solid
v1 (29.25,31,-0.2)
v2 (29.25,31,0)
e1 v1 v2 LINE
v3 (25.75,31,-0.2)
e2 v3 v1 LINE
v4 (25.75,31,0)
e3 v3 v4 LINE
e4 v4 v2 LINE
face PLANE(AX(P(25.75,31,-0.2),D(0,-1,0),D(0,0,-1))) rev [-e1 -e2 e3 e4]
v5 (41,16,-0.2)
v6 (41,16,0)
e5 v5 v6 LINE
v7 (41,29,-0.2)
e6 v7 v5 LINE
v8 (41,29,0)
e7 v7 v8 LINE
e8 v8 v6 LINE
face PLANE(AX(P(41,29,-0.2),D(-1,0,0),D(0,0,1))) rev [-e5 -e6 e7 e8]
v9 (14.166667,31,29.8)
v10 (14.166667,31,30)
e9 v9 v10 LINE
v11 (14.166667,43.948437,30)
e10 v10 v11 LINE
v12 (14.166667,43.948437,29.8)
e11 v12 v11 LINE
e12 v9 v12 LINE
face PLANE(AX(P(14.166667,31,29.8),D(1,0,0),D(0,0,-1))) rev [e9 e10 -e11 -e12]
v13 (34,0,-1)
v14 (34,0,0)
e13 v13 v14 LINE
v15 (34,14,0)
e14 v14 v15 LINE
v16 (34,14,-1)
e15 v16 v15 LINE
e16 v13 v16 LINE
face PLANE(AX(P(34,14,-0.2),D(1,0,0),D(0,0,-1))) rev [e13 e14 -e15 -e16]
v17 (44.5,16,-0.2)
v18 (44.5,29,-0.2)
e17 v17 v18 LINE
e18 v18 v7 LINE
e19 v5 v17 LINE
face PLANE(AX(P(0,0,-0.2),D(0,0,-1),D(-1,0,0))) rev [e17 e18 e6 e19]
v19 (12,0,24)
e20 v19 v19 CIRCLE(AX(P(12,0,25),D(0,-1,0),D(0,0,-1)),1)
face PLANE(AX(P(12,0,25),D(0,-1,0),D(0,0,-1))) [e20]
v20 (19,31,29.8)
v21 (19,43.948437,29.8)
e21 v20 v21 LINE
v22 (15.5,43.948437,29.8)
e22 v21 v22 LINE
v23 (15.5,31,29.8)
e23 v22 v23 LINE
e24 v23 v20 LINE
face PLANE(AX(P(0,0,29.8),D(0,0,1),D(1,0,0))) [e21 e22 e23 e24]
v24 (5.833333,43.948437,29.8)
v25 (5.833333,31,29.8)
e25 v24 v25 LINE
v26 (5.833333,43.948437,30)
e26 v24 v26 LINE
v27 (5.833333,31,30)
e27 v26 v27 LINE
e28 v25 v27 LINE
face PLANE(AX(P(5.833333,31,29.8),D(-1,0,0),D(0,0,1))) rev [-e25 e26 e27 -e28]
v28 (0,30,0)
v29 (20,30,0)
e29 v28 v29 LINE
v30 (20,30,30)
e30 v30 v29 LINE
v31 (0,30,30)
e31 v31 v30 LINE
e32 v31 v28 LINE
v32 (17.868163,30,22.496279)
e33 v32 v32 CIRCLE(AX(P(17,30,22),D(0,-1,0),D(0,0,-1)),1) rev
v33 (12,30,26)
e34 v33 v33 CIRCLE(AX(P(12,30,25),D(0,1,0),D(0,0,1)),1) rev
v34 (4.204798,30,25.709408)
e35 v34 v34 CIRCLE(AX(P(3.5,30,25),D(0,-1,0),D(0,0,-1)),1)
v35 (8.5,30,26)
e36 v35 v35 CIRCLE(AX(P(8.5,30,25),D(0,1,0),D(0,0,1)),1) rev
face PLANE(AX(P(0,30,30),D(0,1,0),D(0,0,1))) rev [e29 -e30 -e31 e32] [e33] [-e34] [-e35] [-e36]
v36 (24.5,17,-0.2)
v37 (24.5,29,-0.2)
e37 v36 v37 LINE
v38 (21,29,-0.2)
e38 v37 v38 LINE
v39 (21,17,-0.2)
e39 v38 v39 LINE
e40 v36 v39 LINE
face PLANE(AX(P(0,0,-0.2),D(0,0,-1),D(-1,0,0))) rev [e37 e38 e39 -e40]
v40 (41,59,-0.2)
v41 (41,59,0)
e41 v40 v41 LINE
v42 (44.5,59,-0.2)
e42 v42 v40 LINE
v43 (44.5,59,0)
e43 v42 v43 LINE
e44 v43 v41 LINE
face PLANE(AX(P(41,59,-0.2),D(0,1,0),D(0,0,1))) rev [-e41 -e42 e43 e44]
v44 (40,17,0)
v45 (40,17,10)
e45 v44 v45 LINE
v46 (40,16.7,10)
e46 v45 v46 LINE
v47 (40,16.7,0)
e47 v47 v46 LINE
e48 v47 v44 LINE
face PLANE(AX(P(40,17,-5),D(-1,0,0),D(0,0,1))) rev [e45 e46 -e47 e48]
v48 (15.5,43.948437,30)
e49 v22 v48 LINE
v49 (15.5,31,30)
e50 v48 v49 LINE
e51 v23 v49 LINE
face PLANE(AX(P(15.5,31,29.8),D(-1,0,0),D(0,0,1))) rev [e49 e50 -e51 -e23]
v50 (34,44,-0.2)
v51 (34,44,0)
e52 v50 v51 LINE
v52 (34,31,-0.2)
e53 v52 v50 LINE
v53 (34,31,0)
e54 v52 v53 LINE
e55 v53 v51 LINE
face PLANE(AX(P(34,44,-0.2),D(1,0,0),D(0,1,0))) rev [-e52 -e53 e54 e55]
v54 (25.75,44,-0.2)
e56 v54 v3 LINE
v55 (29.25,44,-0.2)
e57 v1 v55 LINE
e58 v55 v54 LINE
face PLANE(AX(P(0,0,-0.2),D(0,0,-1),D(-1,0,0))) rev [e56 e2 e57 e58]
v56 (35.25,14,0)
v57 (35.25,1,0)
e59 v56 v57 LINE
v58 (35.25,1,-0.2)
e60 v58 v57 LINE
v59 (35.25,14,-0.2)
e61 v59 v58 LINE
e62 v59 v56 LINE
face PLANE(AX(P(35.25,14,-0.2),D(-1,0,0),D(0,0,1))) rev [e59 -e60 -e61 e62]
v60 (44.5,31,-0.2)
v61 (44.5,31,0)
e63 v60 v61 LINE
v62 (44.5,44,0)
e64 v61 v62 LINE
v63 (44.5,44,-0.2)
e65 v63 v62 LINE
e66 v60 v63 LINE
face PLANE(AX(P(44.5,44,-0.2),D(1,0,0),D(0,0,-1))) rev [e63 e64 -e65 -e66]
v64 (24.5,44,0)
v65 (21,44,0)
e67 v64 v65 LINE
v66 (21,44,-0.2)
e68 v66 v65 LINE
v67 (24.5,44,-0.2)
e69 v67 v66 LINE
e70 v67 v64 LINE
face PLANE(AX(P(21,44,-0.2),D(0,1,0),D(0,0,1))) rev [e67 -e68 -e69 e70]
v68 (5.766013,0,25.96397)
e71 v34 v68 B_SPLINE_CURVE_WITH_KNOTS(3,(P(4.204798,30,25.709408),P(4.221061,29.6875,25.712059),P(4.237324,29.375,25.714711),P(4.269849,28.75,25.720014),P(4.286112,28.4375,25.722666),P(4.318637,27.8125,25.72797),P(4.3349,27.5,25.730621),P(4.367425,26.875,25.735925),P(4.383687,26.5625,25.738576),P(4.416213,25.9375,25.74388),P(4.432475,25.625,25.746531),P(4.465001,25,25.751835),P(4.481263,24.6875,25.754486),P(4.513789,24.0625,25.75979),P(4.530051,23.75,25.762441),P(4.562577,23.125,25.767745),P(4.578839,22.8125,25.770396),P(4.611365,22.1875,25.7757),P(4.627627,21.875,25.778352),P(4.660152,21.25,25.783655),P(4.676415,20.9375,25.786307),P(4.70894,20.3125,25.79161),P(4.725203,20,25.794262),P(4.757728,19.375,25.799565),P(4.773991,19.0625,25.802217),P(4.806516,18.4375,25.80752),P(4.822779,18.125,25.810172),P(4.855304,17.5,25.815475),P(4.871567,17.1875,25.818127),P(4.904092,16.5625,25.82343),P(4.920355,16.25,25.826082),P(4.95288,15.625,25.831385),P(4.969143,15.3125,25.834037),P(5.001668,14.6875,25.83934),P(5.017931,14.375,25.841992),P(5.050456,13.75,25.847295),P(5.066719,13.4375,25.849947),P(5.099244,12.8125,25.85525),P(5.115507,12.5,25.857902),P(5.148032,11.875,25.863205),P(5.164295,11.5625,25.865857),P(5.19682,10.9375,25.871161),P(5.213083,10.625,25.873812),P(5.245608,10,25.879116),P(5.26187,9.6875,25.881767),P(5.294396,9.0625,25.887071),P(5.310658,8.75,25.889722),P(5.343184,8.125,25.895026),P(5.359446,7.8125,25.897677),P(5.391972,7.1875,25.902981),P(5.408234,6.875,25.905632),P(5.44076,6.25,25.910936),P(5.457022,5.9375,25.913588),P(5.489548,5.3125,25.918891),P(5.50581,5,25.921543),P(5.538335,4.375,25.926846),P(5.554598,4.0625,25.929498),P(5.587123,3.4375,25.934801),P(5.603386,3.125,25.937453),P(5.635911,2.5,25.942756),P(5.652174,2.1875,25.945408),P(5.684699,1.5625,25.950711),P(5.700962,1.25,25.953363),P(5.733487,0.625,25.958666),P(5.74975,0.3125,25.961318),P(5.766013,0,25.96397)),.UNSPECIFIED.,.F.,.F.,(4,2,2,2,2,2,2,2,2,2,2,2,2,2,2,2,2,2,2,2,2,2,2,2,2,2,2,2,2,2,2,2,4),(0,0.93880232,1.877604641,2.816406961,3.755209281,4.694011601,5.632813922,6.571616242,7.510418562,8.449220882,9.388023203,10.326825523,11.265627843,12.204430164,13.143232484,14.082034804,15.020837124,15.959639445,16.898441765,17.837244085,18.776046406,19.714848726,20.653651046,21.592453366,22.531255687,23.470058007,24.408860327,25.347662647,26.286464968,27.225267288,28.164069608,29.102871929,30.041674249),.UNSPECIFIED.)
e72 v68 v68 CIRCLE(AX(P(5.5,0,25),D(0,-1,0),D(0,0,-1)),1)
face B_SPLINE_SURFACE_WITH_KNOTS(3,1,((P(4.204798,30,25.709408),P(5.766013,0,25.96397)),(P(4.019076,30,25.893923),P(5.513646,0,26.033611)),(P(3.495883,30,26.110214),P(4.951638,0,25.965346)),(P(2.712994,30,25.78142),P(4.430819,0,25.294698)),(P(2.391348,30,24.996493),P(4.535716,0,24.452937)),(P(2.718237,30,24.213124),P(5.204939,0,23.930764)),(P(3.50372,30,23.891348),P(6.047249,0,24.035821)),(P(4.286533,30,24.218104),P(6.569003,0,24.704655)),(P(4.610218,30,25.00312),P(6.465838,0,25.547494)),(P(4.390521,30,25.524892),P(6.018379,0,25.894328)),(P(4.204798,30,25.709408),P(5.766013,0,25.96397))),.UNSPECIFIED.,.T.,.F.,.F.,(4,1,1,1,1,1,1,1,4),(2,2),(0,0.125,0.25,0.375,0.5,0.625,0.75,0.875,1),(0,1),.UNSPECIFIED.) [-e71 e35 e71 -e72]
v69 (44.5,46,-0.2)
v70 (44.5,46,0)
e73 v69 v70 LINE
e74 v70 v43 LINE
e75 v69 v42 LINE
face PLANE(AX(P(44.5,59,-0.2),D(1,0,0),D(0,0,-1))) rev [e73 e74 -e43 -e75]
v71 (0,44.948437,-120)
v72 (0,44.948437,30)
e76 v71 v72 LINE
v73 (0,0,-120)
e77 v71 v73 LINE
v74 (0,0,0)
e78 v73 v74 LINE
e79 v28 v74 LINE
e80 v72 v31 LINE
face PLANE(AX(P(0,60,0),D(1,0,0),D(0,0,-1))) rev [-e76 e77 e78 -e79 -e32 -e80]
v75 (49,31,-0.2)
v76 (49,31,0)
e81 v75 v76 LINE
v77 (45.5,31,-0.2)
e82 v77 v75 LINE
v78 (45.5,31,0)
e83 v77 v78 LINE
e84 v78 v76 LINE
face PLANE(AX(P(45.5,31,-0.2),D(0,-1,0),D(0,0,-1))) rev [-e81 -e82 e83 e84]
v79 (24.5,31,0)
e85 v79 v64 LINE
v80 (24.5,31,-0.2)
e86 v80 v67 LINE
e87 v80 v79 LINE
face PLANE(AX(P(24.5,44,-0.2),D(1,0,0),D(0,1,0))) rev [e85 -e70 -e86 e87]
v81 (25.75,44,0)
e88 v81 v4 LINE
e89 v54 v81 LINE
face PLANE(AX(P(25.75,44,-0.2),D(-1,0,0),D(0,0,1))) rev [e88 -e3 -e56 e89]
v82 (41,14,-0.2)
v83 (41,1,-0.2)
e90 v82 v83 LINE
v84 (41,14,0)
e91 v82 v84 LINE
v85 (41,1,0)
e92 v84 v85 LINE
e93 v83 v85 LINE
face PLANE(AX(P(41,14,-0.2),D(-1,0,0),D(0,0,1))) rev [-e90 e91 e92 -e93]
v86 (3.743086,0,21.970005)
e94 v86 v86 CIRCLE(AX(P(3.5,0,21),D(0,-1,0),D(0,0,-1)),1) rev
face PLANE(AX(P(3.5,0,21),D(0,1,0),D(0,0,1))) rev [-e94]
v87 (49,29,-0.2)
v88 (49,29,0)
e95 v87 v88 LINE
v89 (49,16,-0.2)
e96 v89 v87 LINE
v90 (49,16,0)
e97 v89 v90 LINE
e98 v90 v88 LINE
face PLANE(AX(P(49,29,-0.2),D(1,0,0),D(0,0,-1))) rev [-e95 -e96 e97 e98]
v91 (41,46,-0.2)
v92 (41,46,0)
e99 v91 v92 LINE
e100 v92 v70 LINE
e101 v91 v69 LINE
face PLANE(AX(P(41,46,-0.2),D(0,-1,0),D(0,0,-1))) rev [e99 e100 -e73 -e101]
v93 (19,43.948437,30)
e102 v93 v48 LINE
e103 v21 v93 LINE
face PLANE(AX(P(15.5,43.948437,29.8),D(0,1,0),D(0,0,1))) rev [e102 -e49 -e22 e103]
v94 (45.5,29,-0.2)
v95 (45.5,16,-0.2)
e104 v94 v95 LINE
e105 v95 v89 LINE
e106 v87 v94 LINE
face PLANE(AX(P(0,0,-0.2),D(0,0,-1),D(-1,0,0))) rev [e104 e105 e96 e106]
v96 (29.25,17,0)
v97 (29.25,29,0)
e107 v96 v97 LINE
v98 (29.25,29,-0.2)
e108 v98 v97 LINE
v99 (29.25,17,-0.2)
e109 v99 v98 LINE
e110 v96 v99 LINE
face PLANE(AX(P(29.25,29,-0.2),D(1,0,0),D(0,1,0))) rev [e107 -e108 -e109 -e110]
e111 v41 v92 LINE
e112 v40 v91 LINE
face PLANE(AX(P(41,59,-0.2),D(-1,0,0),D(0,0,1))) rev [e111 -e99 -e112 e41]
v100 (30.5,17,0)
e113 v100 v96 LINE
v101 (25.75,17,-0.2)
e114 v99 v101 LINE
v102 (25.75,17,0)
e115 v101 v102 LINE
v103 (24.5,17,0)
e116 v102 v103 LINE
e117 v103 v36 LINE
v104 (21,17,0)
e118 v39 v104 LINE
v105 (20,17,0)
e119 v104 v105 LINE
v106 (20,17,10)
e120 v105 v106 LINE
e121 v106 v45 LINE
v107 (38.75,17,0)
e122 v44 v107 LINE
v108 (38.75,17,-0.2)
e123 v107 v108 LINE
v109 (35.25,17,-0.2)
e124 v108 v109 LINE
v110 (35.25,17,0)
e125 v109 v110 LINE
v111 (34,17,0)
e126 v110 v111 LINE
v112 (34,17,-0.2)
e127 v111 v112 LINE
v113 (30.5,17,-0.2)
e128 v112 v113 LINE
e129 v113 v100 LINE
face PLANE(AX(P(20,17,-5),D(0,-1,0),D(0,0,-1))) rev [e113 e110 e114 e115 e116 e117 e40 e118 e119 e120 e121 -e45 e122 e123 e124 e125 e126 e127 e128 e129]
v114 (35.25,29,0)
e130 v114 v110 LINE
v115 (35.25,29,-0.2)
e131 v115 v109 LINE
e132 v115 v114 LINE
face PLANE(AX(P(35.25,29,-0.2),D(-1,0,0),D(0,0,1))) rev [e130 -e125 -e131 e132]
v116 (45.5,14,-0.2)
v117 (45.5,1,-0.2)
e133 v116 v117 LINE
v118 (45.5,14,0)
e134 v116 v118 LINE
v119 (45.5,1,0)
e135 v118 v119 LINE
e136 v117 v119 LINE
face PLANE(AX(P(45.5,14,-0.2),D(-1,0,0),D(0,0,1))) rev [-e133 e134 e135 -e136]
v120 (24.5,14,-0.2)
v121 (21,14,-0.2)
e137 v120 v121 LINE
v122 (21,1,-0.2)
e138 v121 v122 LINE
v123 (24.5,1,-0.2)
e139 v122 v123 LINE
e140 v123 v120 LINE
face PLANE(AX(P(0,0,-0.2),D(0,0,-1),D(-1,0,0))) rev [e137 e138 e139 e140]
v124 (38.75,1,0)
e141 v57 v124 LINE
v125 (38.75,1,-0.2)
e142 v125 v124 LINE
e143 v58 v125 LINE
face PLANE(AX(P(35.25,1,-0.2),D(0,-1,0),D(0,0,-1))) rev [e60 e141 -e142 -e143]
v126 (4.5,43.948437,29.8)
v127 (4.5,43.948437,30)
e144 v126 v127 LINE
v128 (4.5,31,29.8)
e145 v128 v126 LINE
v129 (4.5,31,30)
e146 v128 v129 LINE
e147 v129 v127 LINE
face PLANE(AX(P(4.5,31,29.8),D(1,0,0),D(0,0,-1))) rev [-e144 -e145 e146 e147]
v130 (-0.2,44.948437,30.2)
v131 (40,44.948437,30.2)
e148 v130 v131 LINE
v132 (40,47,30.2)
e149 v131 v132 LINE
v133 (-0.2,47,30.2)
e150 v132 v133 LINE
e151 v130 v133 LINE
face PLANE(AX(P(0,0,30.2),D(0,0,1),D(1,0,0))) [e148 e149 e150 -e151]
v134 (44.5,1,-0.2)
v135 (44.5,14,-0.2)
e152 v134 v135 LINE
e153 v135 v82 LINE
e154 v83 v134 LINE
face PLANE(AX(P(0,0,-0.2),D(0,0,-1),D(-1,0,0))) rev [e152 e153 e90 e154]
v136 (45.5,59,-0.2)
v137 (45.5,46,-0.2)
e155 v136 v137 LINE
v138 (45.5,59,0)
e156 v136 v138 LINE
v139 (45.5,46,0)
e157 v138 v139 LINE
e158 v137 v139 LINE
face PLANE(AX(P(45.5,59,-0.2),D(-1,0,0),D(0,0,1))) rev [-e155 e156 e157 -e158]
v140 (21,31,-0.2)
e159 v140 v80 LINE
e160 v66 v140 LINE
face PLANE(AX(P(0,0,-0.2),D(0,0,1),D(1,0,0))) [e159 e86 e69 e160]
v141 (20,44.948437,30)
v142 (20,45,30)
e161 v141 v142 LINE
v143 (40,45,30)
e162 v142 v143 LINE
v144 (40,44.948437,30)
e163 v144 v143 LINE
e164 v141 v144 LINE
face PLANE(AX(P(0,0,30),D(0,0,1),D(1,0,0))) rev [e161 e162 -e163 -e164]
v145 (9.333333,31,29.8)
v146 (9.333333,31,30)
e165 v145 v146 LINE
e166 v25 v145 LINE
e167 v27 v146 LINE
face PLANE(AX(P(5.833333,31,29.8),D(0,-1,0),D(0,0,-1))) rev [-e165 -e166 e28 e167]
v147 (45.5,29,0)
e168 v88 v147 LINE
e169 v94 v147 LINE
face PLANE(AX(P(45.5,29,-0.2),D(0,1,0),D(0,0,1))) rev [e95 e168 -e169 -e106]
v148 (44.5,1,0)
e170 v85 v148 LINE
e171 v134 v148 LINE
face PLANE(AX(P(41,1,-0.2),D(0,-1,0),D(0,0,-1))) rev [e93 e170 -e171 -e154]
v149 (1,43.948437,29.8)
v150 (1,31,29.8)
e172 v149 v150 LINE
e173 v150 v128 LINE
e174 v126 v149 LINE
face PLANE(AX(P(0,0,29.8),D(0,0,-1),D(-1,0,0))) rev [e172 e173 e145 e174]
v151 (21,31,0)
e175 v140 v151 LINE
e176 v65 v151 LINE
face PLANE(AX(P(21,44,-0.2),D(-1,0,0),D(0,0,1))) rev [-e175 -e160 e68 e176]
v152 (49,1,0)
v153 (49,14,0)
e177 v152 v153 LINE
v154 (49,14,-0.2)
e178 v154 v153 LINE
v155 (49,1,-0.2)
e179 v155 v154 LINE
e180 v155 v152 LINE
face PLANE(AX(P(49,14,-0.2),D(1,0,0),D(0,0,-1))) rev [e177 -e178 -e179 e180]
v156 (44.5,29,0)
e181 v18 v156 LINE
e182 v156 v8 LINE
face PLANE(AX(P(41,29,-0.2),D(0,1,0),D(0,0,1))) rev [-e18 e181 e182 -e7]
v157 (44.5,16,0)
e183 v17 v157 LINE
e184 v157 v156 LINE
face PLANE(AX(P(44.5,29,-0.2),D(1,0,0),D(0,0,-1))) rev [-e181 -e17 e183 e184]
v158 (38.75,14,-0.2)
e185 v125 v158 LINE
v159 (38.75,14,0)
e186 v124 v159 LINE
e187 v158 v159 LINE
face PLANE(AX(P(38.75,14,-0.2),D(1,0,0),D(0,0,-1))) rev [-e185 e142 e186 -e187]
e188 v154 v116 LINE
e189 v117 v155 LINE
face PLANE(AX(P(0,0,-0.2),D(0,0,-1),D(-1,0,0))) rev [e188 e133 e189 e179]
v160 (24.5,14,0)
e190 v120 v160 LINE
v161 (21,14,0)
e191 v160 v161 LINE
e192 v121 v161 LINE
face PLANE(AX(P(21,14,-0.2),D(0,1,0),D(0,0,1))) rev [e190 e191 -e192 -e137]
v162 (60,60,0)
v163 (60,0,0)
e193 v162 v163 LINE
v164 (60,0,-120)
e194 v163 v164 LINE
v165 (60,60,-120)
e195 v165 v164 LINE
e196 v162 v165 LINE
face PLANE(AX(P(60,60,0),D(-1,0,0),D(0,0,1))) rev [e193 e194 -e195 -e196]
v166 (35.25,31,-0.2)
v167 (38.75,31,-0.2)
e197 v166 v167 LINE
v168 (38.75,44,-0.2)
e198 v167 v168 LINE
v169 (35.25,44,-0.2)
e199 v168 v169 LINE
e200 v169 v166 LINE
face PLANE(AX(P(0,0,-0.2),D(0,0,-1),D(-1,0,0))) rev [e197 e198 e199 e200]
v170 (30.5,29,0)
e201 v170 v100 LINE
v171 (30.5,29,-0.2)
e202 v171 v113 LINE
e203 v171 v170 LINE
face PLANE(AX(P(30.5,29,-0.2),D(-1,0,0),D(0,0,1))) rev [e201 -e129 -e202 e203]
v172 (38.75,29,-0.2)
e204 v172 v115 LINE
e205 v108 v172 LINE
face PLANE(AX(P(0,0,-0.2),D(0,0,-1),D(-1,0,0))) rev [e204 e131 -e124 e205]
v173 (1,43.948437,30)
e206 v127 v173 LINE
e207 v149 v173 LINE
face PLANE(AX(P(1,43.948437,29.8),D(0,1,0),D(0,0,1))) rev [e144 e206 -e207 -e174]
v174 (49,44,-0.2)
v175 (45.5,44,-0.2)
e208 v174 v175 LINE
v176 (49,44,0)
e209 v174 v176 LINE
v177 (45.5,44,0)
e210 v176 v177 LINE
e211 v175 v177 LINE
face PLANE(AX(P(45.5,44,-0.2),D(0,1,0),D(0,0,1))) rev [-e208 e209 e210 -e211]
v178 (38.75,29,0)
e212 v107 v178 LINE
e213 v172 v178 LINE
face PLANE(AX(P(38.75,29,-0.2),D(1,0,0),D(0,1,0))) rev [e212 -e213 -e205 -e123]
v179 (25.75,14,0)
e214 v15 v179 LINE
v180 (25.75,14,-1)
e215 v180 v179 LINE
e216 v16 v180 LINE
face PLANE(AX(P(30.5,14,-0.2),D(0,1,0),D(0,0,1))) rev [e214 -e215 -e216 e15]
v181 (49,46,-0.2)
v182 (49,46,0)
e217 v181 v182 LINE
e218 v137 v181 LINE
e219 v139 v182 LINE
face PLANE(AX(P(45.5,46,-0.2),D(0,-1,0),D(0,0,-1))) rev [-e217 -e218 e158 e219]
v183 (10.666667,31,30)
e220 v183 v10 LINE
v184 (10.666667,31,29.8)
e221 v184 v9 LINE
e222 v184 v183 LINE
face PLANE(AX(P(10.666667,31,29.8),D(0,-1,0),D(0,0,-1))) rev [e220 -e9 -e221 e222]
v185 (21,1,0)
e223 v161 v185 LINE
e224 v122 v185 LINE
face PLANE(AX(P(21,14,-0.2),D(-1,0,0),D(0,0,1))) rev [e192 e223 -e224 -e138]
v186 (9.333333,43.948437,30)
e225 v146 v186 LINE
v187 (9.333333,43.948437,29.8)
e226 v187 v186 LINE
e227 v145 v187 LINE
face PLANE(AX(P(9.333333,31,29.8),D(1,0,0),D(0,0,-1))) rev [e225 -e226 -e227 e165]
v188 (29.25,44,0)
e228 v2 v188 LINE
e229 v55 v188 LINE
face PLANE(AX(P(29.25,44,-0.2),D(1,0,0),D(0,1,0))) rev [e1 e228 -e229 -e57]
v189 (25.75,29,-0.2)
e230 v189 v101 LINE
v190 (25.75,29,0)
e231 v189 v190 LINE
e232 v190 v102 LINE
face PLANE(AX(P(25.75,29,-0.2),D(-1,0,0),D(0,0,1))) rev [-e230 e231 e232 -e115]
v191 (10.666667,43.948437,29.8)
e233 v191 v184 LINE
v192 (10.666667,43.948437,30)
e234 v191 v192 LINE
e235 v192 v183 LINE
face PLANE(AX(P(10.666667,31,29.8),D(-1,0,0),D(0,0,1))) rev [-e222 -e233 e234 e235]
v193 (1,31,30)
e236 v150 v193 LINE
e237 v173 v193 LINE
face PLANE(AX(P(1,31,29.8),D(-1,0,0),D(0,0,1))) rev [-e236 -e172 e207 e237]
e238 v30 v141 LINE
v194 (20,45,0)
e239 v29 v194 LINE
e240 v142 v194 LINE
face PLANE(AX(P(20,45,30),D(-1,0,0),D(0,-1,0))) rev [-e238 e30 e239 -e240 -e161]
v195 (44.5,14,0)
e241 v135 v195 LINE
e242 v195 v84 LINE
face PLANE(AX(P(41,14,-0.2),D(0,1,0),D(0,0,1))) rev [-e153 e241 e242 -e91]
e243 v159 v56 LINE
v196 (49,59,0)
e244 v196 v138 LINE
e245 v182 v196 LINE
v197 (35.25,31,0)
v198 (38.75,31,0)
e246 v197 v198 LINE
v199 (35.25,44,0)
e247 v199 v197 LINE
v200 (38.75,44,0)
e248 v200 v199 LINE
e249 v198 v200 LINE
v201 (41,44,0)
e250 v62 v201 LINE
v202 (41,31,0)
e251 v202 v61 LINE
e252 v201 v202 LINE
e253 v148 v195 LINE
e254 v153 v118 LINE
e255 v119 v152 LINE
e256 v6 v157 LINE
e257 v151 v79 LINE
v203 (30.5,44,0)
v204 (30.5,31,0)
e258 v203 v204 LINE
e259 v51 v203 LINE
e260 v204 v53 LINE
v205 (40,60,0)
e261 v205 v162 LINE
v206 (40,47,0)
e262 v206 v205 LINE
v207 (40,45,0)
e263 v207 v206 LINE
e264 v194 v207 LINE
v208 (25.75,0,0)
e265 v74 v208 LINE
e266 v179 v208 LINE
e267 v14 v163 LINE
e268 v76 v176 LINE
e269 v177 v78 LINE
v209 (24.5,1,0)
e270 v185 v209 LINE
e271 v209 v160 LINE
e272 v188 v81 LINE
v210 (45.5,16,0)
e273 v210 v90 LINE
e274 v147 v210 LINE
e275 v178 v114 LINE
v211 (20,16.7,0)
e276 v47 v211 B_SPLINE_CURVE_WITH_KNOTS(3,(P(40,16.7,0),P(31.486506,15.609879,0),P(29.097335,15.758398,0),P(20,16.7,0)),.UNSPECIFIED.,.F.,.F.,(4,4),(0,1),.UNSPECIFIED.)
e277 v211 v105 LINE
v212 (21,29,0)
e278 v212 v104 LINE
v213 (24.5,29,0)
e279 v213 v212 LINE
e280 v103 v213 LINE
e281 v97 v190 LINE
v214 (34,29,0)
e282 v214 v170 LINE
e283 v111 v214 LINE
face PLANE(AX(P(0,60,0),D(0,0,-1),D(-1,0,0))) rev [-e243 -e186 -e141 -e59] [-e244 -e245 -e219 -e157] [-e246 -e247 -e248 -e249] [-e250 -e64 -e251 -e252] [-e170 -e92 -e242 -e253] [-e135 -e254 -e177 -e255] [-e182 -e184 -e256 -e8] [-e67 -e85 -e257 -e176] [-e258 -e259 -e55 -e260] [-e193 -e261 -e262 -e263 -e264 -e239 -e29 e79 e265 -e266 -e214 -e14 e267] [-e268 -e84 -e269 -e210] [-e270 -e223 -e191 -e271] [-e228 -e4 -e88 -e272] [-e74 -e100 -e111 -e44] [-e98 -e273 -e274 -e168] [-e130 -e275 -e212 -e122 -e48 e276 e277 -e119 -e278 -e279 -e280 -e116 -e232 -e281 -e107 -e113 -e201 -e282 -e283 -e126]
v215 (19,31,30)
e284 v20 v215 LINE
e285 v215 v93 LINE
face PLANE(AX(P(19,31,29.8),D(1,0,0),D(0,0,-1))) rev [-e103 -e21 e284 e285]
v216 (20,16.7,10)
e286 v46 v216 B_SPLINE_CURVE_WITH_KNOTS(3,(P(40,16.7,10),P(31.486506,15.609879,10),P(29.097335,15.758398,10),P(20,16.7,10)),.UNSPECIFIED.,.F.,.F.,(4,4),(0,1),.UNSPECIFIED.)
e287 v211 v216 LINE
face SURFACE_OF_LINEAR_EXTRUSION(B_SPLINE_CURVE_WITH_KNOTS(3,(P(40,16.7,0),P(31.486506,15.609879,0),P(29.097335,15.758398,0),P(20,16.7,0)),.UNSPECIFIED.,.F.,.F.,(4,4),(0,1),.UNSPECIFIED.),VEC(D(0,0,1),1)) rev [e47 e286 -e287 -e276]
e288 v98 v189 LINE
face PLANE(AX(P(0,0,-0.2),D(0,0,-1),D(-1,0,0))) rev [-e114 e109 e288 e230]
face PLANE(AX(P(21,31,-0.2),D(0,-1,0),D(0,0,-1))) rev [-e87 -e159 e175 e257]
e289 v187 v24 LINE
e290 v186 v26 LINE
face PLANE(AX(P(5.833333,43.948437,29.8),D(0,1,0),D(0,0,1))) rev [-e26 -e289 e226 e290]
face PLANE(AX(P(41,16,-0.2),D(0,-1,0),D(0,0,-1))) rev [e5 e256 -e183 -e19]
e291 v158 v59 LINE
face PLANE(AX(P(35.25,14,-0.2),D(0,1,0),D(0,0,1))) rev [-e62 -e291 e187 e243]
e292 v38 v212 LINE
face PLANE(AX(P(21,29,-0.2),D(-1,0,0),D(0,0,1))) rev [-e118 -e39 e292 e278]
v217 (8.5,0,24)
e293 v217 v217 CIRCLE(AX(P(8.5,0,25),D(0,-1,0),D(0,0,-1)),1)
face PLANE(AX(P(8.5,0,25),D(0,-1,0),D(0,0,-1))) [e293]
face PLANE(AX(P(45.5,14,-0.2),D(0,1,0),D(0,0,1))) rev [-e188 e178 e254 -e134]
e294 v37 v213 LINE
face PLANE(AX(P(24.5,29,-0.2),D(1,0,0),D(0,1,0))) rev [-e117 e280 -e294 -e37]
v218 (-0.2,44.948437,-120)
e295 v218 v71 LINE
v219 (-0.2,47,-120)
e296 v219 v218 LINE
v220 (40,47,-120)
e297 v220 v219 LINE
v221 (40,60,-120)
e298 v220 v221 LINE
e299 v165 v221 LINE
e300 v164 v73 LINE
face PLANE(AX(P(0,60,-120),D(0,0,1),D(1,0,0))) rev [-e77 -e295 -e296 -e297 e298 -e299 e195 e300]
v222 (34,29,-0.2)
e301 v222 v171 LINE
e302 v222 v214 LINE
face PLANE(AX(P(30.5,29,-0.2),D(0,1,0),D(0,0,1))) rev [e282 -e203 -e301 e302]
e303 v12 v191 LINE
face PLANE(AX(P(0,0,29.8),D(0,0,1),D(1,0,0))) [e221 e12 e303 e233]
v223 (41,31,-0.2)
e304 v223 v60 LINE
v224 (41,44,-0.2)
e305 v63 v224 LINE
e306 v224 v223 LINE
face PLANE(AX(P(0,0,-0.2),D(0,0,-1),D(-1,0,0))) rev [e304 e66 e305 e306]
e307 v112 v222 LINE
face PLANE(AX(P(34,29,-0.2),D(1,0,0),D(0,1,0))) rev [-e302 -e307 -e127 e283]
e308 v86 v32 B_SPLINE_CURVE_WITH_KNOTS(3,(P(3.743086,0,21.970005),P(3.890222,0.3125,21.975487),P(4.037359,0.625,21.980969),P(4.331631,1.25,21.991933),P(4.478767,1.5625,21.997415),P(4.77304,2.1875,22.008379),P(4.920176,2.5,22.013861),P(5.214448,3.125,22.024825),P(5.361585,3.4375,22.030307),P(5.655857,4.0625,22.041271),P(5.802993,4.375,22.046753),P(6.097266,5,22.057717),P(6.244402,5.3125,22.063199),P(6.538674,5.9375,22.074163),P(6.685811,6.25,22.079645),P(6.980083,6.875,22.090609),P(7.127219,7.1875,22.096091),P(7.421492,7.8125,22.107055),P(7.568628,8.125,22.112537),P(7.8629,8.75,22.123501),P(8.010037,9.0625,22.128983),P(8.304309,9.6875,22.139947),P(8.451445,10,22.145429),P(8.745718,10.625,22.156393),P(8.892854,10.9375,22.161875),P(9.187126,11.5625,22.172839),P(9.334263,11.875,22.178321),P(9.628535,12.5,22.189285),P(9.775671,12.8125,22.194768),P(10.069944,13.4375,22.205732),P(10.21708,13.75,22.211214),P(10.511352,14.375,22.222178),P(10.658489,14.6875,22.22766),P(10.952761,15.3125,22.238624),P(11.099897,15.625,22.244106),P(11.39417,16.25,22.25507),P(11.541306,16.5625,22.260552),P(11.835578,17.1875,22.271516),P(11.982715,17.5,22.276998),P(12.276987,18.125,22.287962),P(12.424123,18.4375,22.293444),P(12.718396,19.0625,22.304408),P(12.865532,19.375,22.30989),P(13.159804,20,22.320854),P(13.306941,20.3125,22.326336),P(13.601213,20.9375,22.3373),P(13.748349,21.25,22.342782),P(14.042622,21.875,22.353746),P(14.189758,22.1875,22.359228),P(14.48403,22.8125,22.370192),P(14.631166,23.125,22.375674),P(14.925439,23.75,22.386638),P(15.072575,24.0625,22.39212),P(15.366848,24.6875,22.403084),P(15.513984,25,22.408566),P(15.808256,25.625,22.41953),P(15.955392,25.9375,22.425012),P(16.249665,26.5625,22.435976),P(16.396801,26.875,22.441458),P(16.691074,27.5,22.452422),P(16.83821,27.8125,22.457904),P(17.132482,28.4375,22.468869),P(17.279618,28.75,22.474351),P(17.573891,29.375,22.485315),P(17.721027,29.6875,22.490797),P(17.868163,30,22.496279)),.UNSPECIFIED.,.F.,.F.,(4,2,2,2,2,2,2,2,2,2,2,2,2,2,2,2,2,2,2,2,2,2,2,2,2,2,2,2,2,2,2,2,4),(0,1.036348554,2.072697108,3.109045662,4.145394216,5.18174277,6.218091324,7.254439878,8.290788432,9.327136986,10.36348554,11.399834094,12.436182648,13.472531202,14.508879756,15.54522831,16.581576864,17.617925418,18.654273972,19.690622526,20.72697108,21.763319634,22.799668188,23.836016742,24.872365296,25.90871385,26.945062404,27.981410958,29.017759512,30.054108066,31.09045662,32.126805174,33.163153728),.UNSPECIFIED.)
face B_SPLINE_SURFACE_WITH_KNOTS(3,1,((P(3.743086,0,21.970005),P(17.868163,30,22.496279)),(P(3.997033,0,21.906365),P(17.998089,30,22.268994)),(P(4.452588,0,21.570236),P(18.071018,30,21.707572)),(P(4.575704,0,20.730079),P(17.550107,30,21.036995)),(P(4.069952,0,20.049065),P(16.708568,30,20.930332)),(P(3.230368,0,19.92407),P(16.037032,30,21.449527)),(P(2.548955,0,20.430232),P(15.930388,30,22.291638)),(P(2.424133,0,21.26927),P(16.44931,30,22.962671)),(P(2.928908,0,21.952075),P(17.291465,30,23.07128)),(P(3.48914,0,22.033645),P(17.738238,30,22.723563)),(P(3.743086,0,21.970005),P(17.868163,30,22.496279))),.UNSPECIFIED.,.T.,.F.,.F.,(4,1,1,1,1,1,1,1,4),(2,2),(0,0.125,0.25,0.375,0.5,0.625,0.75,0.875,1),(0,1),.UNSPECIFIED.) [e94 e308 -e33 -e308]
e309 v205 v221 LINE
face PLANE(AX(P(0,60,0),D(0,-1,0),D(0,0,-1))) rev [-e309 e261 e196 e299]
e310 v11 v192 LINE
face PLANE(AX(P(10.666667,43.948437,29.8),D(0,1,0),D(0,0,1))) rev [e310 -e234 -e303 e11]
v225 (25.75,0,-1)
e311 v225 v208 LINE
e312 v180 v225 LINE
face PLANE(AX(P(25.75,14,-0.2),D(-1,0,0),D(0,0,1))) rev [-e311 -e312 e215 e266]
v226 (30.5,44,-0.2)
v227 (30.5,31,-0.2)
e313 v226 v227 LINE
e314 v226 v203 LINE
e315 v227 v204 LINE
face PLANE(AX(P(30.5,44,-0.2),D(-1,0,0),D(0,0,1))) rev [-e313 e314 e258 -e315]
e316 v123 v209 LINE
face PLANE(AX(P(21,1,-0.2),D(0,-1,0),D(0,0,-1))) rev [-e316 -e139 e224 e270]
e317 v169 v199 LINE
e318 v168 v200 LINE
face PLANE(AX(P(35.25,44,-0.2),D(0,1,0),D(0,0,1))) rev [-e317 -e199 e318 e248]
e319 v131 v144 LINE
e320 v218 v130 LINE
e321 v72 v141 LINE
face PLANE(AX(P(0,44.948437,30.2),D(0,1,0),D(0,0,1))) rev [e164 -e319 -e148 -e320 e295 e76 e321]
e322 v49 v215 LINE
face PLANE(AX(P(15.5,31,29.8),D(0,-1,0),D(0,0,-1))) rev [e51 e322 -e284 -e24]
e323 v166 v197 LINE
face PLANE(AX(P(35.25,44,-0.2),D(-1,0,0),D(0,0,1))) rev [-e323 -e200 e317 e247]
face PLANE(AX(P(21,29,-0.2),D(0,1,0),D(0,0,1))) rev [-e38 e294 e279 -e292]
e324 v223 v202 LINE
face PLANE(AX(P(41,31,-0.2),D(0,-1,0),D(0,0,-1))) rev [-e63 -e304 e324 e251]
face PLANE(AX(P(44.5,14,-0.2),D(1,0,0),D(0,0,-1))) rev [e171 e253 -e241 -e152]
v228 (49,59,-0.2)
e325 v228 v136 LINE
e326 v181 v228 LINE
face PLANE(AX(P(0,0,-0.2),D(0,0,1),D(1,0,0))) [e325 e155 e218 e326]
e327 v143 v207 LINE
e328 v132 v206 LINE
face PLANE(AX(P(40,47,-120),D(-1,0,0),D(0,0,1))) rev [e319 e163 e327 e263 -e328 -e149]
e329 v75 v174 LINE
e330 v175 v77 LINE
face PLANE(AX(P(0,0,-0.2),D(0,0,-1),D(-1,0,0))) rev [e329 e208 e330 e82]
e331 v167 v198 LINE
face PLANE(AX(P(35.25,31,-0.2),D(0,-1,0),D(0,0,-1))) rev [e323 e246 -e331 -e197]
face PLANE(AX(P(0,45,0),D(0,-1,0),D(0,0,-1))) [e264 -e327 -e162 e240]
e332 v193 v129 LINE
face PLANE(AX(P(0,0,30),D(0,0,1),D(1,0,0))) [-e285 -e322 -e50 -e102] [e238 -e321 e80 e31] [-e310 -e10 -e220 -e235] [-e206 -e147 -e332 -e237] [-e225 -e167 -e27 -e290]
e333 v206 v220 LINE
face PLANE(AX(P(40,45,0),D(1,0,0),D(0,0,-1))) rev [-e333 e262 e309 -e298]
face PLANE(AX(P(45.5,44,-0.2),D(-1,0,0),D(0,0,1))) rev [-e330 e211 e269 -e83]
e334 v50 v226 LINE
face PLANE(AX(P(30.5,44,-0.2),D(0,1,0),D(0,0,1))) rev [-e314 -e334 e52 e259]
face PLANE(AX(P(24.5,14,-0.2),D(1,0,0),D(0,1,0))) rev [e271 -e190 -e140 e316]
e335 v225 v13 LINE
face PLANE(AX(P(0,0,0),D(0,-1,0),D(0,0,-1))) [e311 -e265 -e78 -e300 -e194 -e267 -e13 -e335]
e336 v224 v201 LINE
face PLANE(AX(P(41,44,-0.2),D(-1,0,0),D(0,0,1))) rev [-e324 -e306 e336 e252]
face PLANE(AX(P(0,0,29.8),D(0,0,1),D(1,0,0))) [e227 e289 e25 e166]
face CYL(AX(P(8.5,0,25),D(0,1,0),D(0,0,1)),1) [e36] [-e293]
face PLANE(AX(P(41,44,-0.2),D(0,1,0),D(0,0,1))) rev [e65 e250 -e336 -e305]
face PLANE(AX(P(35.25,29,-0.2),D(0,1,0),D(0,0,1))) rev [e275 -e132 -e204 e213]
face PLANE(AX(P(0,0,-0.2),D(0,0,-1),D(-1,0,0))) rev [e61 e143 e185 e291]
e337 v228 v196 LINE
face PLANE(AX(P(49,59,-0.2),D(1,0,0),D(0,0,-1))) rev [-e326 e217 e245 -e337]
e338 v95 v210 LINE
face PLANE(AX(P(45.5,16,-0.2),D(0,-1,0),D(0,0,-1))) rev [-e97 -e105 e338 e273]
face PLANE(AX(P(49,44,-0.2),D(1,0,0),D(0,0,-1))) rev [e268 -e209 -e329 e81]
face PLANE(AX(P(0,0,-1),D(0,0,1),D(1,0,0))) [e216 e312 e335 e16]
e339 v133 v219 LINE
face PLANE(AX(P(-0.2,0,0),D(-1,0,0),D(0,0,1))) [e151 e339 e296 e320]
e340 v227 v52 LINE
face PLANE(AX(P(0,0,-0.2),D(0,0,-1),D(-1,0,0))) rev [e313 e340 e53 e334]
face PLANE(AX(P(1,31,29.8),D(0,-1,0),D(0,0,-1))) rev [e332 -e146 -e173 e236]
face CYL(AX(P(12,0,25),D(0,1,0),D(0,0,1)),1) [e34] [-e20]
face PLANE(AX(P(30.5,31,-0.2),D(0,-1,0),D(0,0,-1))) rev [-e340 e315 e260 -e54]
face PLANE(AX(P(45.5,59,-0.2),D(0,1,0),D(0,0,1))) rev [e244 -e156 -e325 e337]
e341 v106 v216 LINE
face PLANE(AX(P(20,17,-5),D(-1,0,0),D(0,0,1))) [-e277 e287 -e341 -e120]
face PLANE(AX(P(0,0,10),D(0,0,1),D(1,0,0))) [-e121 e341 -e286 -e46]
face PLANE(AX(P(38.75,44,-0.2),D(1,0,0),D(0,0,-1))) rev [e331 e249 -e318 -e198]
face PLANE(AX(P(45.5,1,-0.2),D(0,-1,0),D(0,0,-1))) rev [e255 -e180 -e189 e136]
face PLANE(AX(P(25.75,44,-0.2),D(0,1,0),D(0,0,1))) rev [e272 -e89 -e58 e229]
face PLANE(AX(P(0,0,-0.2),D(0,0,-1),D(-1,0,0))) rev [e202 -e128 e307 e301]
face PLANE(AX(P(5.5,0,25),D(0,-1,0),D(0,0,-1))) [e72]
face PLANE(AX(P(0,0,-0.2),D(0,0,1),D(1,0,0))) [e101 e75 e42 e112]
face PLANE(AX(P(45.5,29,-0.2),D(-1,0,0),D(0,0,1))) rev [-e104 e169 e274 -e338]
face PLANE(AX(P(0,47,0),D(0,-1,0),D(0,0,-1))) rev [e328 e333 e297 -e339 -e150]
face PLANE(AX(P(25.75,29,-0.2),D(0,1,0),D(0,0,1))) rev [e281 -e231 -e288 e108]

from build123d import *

# Parameters (mm, degrees)
SKETCH1_W                = 60
SKETCH1_H                = 120
BOSS_EXTRUDE1_DEPTH      = 60
SKETCH2_W                = 40
SKETCH2_H                = 120
CUT_EXTRUDE1_DEPTH       = 15
SKETCH3_W                = 20
SKETCH3_H                = 15
BOSS_EXTRUDE2_DEPTH      = 30
SKETCH4_W                = 40
SKETCH4_H                = 150
BOSS_EXTRUDE3_DEPTH      = 2
SKETCH6_W                = 3.5
SKETCH6_H                = 13
CUT_EXTRUDE2_DEPTH       = 0.2
SKETCH7_W                = 40
SKETCH7_H                = 2.051563456
BOSS_EXTRUDE5_DEPTH      = 0.2
SKETCH8_W                = 3.5
SKETCH8_H                = 12.948436544
CUT_EXTRUDE3_DEPTH       = 0.2
SKETCH9_W                = 3.5
SKETCH9_H                = 13
CUT_EXTRUDE4_DEPTH       = 0.2
BOSS_EXTRUDE6_DEPTH      = 10
BOSS_EXTRUDE6_DEPTH_BACK = 5
SKETCH5_W                = 20
SKETCH5_H                = 2
CUT_EXTRUDE6_DEPTH       = 10
SKETCH11_R               = 1
BOSS_EXTRUDE7_DEPTH      = 30
SKETCH16_W               = 8.25
SKETCH16_H               = 14
CUT_EXTRUDE10_DEPTH      = 1
SKETCH17_W               = 150.2
SKETCH17_H               = 2.051563456
BOSS_EXTRUDE8_DEPTH      = 0.2


with BuildPart() as part:
    # Sketch1 → Boss-Extrude1 (new body)
    with BuildSketch(Plane(origin=(0, 0, 0), x_dir=(1, 0, 0), z_dir=(0, 1, 0))):
        with Locations((30, 60)):
            Rectangle(SKETCH1_W, SKETCH1_H)
    extrude(amount=BOSS_EXTRUDE1_DEPTH)

    # Sketch2 → Cut-Extrude1 (cut)
    with BuildSketch(Plane(origin=(0, 60, 0), x_dir=(1, 0, 0), z_dir=(0, 1, 0))):
        with Locations((20, 60)):
            Rectangle(SKETCH2_W, SKETCH2_H)
    extrude(amount=-CUT_EXTRUDE1_DEPTH, mode=Mode.SUBTRACT)

    # Sketch3 → Boss-Extrude2 (add)
    with BuildSketch(Plane.XY):
        with Locations((10, 37.5)):
            Rectangle(SKETCH3_W, SKETCH3_H)
    extrude(amount=BOSS_EXTRUDE2_DEPTH)

    # Sketch4 → Boss-Extrude3 (add)
    with BuildSketch(Plane(origin=(0, 45, 0), x_dir=(1, 0, 0), z_dir=(0, 1, 0))):
        with Locations((20, 45)):
            Rectangle(SKETCH4_W, SKETCH4_H)
    extrude(amount=BOSS_EXTRUDE3_DEPTH)

    # Sketch6 → Cut-Extrude2 (cut)
    with BuildSketch(Plane.XY):
        with Locations((42.75, 52.5)):
            Rectangle(SKETCH6_W, SKETCH6_H)
        with Locations((47.25, 52.5)):
            Rectangle(SKETCH6_W, SKETCH6_H)
        with Locations((42.75, 37.5)):
            Rectangle(SKETCH6_W, SKETCH6_H)
        with Locations((47.25, 37.5)):
            Rectangle(SKETCH6_W, SKETCH6_H)
        with Locations((42.75, 22.5)):
            Rectangle(SKETCH6_W, SKETCH6_H)
        with Locations((47.25, 22.5)):
            Rectangle(SKETCH6_W, SKETCH6_H)
        with Locations((42.75, 7.5)):
            Rectangle(SKETCH6_W, SKETCH6_H)
        with Locations((47.25, 7.5)):
            Rectangle(SKETCH6_W, SKETCH6_H)
    extrude(amount=-CUT_EXTRUDE2_DEPTH, mode=Mode.SUBTRACT)

    # Sketch7 → Boss-Extrude5 (add)
    with BuildSketch(Plane.XY.offset(30)):
        with Locations((20, 45.974218272)):
            Rectangle(SKETCH7_W, SKETCH7_H)
    extrude(amount=BOSS_EXTRUDE5_DEPTH)

    # Sketch8 → Cut-Extrude3 (cut)
    with BuildSketch(Plane.XY.offset(30)):
        with Locations((2.75, 37.474218272)):
            Rectangle(SKETCH8_W, SKETCH8_H)
        with Locations((7.583333333, 37.474218272)):
            Rectangle(SKETCH8_W, SKETCH8_H)
        with Locations((12.416666667, 37.474218272)):
            Rectangle(SKETCH8_W, SKETCH8_H)
        with Locations((17.25, 37.474218272)):
            Rectangle(SKETCH8_W, SKETCH8_H)
    extrude(amount=-CUT_EXTRUDE3_DEPTH, mode=Mode.SUBTRACT)

    # Sketch9 → Cut-Extrude4 (cut)
    with BuildSketch(Plane.XY):
        with Locations((22.75, 37.5)):
            Rectangle(SKETCH9_W, SKETCH9_H)
        with Locations((27.5, 37.5)):
            Rectangle(SKETCH9_W, SKETCH9_H)
        with Locations((32.25, 37.5)):
            Rectangle(SKETCH9_W, SKETCH9_H)
        with Locations((37, 37.5)):
            Rectangle(SKETCH9_W, SKETCH9_H)
        with Locations((27.5, 22.5)):
            Rectangle(SKETCH9_W, SKETCH9_H)
        with Locations((32.25, 22.5)):
            Rectangle(SKETCH9_W, SKETCH9_H)
        with Locations((37, 22.5)):
            Rectangle(SKETCH9_W, SKETCH9_H)
        with Locations((27.5, 7.5)):
            Rectangle(SKETCH9_W, SKETCH9_H)
        with Locations((32.25, 7.5)):
            Rectangle(SKETCH9_W, SKETCH9_H)
        with Locations((37, 7.5)):
            Rectangle(SKETCH9_W, SKETCH9_H)
        with Locations((22.75, 22.5)):
            Rectangle(SKETCH9_W, SKETCH9_H)
        with Locations((22.75, 7.5)):
            Rectangle(SKETCH9_W, SKETCH9_H)
    extrude(amount=-CUT_EXTRUDE4_DEPTH, mode=Mode.SUBTRACT)

    # Sketch5 → Boss-Extrude6 (add, two sides: drawn at the far end of the back side and taken through both)
    with BuildSketch(Plane.XY.offset(-BOSS_EXTRUDE6_DEPTH_BACK)):
        with Locations((30, 16)):
            Rectangle(SKETCH5_W, SKETCH5_H)
    extrude(amount=BOSS_EXTRUDE6_DEPTH + BOSS_EXTRUDE6_DEPTH_BACK)

    # Sketch10 → Cut-Extrude6 (cut)
    with BuildSketch(Plane.XY.offset(10)):
        with BuildLine():
            Line((20, 16.7), (20, 14.90002652))
            Line((20, 14.90002652), (40, 15))
            Line((40, 15), (40, 16.7))
            add(Edge.make_bspline(
                [(20, 16.7), (29.09733539, 15.758398235), (31.486505864, 15.609879035), (40, 16.7)],
                knots=[0, 0, 0, 0, 1, 1, 1, 1], degree=3))
        make_face()
    extrude(amount=-CUT_EXTRUDE6_DEPTH, mode=Mode.SUBTRACT)

    # Sketch11 → Boss-Extrude7 (add)
    with BuildSketch(Plane(origin=(0, 30, 0), x_dir=(-1, 0, 0), z_dir=(0, -1, 0))):
        with Locations(Location((-8.5, -25, 0), (0, 0, 270))):
            Circle(SKETCH11_R)
        with Locations(Location((-12, -25, 0), (0, 0, 270))):
            Circle(SKETCH11_R)
    extrude(amount=BOSS_EXTRUDE7_DEPTH)

    # Boundary2: read off the stored shape, not the designer's step
    # Boundary2: loft between two sections, ruled curve by curve
    boundary2_from = [
        Edge.make_bspline([(4.204798324, 30, 25.709407727), (4.019075815, 30, 25.893923496), (3.495882591, 30, 26.110214391), (2.712993599, 30, 25.781419672), (2.391347556, 30, 24.99649345), (2.718236803, 30, 24.213124048), (3.503720437, 30, 23.891348254), (4.286533285, 30, 24.218104118), (4.610217643, 30, 25.003119773), (4.390520832, 30, 25.524891957), (4.204798324, 30, 25.709407727)], [0, 0, 0, 0, 0.125, 0.25, 0.375, 0.5, 0.625, 0.75, 0.875, 1, 1, 1, 1], 3),
    ]
    boundary2_to = [
        Edge.make_bspline([(5.766012578, 0, 25.963969558), (5.513645938, 0, 26.033611488), (4.951638215, 0, 25.965345689), (4.430818642, 0, 25.294698155), (4.535715543, 0, 24.452936912), (5.20493851, 0, 23.930763741), (6.047249113, 0, 24.035821103), (6.569002789, 0, 24.704654753), (6.465838055, 0, 25.547494109), (6.018379218, 0, 25.894327628), (5.766012578, 0, 25.963969558)], [0, 0, 0, 0, 0.125, 0.25, 0.375, 0.5, 0.625, 0.75, 0.875, 1, 1, 1, 1], 3),
    ]
    boundary2 = Solid(Shell([*[Face.make_surface_from_curves(boundary2_from[k], boundary2_to[k]) for k in range(1)], Face(Wire(boundary2_from)), Face(Wire(boundary2_to))]))
    add(boundary2)

    # Boundary3: read off the stored shape, not the designer's step
    # Boundary3: loft between two sections, ruled curve by curve
    boundary3_from = [
        Edge.make_bspline([(3.743086281, 0, 21.97000467), (3.99703291, 0, 21.906364831), (4.452587923, 0, 21.570236089), (4.575703736, 0, 20.730079176), (4.069951831, 0, 20.049064962), (3.230368388, 0, 19.924069587), (2.548955021, 0, 20.43023164), (2.424133085, 0, 21.26926968), (2.92890815, 0, 21.952075126), (3.489139652, 0, 22.03364451), (3.743086281, 0, 21.97000467)], [0, 0, 0, 0, 0.125, 0.25, 0.375, 0.5, 0.625, 0.75, 0.875, 1, 1, 1, 1], 3),
    ]
    boundary3_to = [
        Edge.make_bspline([(17.868163304, 30, 22.496278629), (17.998088745, 30, 22.268994008), (18.071017752, 30, 21.707572365), (17.550107266, 30, 21.036995444), (16.708568065, 30, 20.930331844), (16.03703216, 30, 21.449527114), (15.930388089, 30, 22.291638296), (16.449309955, 30, 22.962671415), (17.291465105, 30, 23.071280094), (17.738237863, 30, 22.723563251), (17.868163304, 30, 22.496278629)], [0, 0, 0, 0, 0.125, 0.25, 0.375, 0.5, 0.625, 0.75, 0.875, 1, 1, 1, 1], 3),
    ]
    boundary3 = Solid(Shell([*[Face.make_surface_from_curves(boundary3_from[k], boundary3_to[k]) for k in range(1)], Face(Wire(boundary3_from)), Face(Wire(boundary3_to))]))
    add(boundary3)

    # Sketch16 → Cut-Extrude10 (cut)
    with BuildSketch(Plane.XY):
        with Locations((29.875, 7)):
            Rectangle(SKETCH16_W, SKETCH16_H)
    extrude(amount=-CUT_EXTRUDE10_DEPTH, mode=Mode.SUBTRACT)

    # Sketch17 → Boss-Extrude8 (add)
    with BuildSketch(Plane.ZY):
        with Locations((-44.9, 45.974218272)):
            Rectangle(SKETCH17_W, SKETCH17_H)
    extrude(amount=BOSS_EXTRUDE8_DEPTH)


solid = part.part
